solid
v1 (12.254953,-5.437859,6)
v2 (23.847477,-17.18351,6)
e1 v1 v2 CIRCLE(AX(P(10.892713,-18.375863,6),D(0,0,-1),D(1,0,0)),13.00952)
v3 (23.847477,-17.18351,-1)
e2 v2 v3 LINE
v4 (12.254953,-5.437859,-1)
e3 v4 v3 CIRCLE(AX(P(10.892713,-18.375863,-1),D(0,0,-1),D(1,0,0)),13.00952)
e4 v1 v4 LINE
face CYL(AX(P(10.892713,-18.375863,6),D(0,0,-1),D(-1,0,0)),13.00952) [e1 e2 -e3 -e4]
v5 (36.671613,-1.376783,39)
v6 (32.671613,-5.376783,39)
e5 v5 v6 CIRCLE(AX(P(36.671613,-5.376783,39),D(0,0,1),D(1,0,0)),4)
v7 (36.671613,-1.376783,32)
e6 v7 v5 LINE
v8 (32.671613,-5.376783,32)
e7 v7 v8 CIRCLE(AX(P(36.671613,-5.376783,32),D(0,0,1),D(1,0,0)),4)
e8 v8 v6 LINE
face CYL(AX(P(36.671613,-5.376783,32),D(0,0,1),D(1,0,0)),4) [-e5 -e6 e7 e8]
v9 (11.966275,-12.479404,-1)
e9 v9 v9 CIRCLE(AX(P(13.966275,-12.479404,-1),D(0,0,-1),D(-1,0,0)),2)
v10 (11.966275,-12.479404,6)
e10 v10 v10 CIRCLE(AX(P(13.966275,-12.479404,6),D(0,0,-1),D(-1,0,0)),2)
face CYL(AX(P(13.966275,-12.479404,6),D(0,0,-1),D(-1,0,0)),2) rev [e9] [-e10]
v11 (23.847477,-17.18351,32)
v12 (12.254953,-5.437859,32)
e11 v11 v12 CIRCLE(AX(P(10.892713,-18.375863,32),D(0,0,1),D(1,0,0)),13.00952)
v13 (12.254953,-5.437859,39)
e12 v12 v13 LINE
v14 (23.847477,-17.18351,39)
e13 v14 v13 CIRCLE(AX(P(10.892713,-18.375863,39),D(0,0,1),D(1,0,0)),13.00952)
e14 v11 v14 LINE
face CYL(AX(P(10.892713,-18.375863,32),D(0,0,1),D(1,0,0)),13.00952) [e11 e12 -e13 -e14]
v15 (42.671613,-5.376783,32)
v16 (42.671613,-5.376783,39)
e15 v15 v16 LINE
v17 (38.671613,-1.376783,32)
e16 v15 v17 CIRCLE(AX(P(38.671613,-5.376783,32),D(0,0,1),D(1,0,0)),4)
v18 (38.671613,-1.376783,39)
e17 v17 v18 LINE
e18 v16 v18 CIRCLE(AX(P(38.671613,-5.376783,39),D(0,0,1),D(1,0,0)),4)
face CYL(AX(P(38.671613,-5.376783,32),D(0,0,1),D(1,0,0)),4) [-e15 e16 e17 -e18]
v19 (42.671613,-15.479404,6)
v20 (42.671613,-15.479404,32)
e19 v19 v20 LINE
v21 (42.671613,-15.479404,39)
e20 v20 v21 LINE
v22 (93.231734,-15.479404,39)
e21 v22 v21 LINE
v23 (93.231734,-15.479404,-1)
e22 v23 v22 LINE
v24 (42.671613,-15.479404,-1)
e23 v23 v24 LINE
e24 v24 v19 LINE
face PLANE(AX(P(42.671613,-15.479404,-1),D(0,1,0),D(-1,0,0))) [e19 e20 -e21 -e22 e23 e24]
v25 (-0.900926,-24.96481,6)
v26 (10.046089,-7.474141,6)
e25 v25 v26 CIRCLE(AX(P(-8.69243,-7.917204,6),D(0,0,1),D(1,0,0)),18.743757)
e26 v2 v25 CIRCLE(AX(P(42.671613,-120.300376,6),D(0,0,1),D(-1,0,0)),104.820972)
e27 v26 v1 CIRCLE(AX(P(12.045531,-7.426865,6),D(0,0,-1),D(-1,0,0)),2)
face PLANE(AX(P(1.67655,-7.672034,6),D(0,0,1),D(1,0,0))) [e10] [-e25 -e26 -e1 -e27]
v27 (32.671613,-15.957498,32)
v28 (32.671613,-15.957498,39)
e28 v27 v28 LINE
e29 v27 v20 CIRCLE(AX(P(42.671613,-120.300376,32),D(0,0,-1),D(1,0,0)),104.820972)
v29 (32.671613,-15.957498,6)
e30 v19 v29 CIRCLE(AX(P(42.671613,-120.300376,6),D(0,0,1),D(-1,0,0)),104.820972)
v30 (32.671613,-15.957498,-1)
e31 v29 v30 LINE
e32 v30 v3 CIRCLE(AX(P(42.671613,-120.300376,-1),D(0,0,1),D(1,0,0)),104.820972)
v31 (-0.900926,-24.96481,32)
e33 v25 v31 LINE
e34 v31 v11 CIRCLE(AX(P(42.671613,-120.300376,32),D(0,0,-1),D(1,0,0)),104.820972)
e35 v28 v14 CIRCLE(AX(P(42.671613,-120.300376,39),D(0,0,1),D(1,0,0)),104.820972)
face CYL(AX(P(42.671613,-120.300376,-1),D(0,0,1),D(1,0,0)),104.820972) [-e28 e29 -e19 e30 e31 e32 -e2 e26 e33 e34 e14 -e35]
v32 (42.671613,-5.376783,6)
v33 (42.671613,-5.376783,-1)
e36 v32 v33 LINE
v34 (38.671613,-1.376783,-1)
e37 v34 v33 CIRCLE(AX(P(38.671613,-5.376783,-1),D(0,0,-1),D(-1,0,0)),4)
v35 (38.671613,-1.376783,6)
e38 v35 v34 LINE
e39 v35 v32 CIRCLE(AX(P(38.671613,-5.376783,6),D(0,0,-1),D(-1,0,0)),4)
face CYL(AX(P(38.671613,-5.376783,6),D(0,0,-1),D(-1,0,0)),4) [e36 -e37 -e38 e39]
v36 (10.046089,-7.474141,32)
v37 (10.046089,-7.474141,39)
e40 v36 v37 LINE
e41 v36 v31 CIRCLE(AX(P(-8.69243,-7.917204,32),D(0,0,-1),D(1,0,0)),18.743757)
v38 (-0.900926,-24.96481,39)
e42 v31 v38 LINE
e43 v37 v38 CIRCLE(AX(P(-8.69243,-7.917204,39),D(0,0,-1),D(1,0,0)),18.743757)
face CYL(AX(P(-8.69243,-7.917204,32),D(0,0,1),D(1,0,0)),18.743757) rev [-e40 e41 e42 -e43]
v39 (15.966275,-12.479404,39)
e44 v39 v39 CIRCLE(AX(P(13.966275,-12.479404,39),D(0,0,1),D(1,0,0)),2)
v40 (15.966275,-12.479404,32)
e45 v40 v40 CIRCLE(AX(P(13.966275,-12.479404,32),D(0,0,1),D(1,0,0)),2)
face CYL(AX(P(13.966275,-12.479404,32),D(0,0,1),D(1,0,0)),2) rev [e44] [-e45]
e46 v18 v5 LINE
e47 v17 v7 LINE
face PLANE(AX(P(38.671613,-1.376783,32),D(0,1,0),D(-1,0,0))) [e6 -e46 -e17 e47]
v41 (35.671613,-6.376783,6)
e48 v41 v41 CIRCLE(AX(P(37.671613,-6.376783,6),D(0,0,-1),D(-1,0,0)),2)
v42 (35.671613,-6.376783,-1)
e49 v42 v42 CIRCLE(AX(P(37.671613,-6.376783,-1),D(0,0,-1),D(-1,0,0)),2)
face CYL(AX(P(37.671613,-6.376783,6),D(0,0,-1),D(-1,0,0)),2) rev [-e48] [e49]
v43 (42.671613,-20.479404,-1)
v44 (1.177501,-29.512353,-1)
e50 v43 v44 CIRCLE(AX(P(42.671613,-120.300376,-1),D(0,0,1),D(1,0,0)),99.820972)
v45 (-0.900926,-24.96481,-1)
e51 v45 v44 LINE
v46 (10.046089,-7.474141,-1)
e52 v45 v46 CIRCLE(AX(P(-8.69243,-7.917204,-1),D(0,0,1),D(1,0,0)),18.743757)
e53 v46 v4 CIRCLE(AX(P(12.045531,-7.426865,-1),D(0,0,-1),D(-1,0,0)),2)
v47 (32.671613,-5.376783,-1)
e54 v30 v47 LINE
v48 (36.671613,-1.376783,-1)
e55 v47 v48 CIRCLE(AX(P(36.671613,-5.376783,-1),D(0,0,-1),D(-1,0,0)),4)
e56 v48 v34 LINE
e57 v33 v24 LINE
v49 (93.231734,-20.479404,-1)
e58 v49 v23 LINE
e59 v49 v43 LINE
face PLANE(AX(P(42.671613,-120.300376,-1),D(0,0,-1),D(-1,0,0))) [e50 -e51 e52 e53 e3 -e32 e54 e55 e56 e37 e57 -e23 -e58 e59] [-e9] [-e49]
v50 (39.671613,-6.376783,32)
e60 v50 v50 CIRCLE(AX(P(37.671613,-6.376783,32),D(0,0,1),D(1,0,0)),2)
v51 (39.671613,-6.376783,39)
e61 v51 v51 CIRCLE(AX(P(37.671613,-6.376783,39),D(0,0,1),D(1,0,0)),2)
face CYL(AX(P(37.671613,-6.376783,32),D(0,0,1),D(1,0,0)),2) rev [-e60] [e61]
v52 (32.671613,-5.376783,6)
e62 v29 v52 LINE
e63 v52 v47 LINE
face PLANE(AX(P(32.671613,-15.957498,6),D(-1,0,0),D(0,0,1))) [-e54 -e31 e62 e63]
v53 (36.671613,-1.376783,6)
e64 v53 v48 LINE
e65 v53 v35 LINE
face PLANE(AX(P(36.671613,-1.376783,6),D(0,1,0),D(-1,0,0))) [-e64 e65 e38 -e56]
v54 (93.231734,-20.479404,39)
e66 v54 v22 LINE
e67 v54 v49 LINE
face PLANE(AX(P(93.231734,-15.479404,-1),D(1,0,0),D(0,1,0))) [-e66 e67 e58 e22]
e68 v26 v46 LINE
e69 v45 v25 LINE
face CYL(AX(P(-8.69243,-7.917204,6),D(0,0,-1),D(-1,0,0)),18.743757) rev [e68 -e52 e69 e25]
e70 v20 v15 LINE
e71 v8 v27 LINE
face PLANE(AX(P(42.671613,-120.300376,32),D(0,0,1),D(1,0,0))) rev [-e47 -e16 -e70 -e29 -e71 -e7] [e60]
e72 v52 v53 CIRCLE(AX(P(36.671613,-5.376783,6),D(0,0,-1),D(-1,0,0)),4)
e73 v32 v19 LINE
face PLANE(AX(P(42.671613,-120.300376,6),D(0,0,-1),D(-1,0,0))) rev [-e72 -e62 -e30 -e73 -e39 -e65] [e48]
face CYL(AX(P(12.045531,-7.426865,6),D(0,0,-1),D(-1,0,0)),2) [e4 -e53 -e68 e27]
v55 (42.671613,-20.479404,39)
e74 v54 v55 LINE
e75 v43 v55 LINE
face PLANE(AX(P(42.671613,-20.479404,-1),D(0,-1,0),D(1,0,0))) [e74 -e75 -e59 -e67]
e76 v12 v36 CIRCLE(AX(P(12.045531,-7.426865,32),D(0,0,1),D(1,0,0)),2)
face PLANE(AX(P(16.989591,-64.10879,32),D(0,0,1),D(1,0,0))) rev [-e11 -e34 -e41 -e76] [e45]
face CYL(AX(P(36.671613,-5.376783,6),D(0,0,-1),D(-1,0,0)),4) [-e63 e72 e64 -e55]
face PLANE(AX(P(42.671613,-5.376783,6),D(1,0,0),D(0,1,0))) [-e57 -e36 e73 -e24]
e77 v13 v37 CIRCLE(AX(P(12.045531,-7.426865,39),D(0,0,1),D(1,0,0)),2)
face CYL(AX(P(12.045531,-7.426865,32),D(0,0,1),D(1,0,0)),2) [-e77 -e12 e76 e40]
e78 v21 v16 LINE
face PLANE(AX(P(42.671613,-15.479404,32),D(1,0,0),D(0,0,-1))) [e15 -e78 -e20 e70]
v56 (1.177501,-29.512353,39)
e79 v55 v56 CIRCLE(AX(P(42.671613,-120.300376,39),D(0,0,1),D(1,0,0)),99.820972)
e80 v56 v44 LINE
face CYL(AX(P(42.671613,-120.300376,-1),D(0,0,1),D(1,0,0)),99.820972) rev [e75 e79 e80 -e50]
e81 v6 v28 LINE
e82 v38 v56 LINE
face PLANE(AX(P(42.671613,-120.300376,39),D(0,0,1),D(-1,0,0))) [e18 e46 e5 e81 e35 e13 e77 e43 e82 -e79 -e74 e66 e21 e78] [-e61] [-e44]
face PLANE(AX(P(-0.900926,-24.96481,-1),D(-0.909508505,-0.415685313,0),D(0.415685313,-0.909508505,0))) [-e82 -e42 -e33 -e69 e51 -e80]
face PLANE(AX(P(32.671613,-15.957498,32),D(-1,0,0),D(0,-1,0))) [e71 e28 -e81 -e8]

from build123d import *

# Parameters (mm, degrees)
BOSS_EXTRUDE1_DEPTH     = 38
BOSS_EXTRUDE2_START     = 1
BOSS_EXTRUDE2_DEPTH     = 1
SKETCH5_R               = 1.5
BOSS_EXTRUDE4_DEPTH     = 2
CUT_EXTRUDE1_REACH      = 109.923
CUT_EXTRUDE1_END_RADIUS = 5
SKETCH6_W               = 4
SKETCH6_H               = 25
SKETCH7_W               = 12
SKETCH7_H               = 7
CUT_EXTRUDE2_DEPTH      = 4.870537
SKETCH8_W               = 14
SKETCH8_H               = 8
SKETCH8_W_2             = 7
SKETCH8_H_2             = 2
BOSS_EXTRUDE5_DEPTH     = 1
CUT_EXTRUDE3_REACH      = 112.064
BOSS_EXTRUDE6_REACH     = 114.27
FILLET1_R               = 2
FILLET2_R               = 1.5
CUT_EXTRUDE4_START      = -1
CUT_EXTRUDE4_DEPTH      = 1
CUT_EXTRUDE5_DEPTH      = 114.605044241
CUT_EXTRUDE5_DEPTH_BACK = 114.605044241
CUT_EXTRUDE6_DEPTH      = 1
BOSS_EXTRUDE7_DEPTH     = 40
CUT_EXTRUDE7_DEPTH      = 114.952209619
BOSS_EXTRUDE8_START     = -7
SKETCH16_R              = 2
BOSS_EXTRUDE8_DEPTH     = 7
SKETCH17_R              = 2
BOSS_EXTRUDE9_DEPTH     = 7
SKETCH18_R              = 2
BOSS_EXTRUDE10_DEPTH    = 7
BOSS_EXTRUDE11_START    = -7
SKETCH19_R              = 2
BOSS_EXTRUDE11_DEPTH    = 7


with BuildPart() as part:
    # Sketch1 → Boss-Extrude1 (new body)
    with BuildSketch(Plane.XY):
        with BuildLine():
            ThreePointArc((94.07424068, -40.969403892), (98.52214239, -30.71978446), (94.053011164, -20.479403892))
            Line((94.053011164, -20.479403892), (42.671612541, -20.479403892))
            ThreePointArc((42.671612541, -20.479403892), (21.438645912, -22.763779795), (1.177500664, -29.512352859))
            ThreePointArc((1.177500664, -29.512352859), (-2.191079084, -36.245666757), (3.671612541, -40.969403889))
            Line((3.671612541, -40.969403889), (3.671612541, -39.969403889))
            ThreePointArc((3.671612541, -39.969403889), (-1.213963813, -36.032956279), (1.593185977, -30.421861364))
            ThreePointArc((1.593185977, -30.421861364), (21.65135639, -23.740895066), (42.671612541, -21.479403892))
            Line((42.671612541, -21.479403892), (93.651612541, -21.479403892))
            ThreePointArc((93.651612541, -21.479403892), (97.522142299, -30.720228087), (93.671612541, -39.969403889))
            Line((93.671612541, -39.969403889), (93.671612541, -40.969403892))
            Line((93.671612541, -40.969403892), (94.07424068, -40.969403892))
        make_face()
    extrude(amount=BOSS_EXTRUDE1_DEPTH)

    # Sketch2 → Boss-Extrude2 (add)
    with BuildSketch(Plane(origin=(0, 0, 0), x_dir=(-1, 0, 0), z_dir=(0, 0, -1)).offset(BOSS_EXTRUDE2_START)):
        with BuildLine():
            Line((-93.671612541, -40.969403892), (-3.671612541, -40.969403889))
            ThreePointArc((-3.671612541, -40.969403889), (2.191079084, -36.245666757), (-1.177500664, -29.512352859))
            ThreePointArc((-1.177500664, -29.512352859), (-21.438645912, -22.763779795), (-42.671612541, -20.479403892))
            Line((-42.671612541, -20.479403892), (-94.053011164, -20.479403892))
            ThreePointArc((-94.053011164, -20.479403892), (-98.52214239, -30.71978446), (-94.07424068, -40.969403892))
            Line((-94.07424068, -40.969403892), (-93.671612541, -40.969403892))
        make_face()
    boss_extrude2 = extrude(amount=-BOSS_EXTRUDE2_DEPTH)

    # Mirror1: Boss-Extrude2 across plane
    add(boss_extrude2.mirror(Plane.XY.offset(19)))

    # Sketch5 → Boss-Extrude4 (add)
    with BuildSketch(Plane.XZ.offset(21.479403892)):
        with Locations(Location((45.301612541, 27.89, 0), (0, 0, 270))):
            Circle(SKETCH5_R)
        with Locations(Location((45.301612541, 10.11, 0), (0, 0, 270))):
            Circle(SKETCH5_R)
        with Locations(Location((91.021612541, 27.89, 0), (0, 0, 270))):
            Circle(SKETCH5_R)
        with Locations(Location((91.021612541, 10.11, 0), (0, 0, 270))):
            Circle(SKETCH5_R)
    extrude(amount=BOSS_EXTRUDE4_DEPTH)

    # Cut-Extrude1: up to this cylinder (the profile starts outside it)
    cut_extrude1_end = Plane(origin=(3.671612541, -34.969403889, 19), z_dir=(0, 0, -1)) * Cylinder(CUT_EXTRUDE1_END_RADIUS, 230.846, mode=Mode.PRIVATE)
    # Sketch6 → Cut-Extrude1 (cut, up to the surface)
    with BuildSketch(Plane(origin=(0.000112733, -40.969403891, 0), x_dir=(1, 0, 0), z_dir=(0, -1, 0)), mode=Mode.PRIVATE) as cut_extrude1_sk1:
        with Locations((1.671499809, 19)):
            Rectangle(SKETCH6_W, SKETCH6_H)
    cut_extrude1_tool1 = extrude(cut_extrude1_sk1.sketch, amount=-CUT_EXTRUDE1_REACH, mode=Mode.PRIVATE) - cut_extrude1_end
    add(cut_extrude1_tool1.solids().sort_by_distance((1.671613, -40.969404, 19))[0], mode=Mode.SUBTRACT)

    # Sketch7 → Cut-Extrude2 (cut)
    with BuildSketch(Plane(origin=(98.522149904, 0, 0), x_dir=(0, 0, -1), z_dir=(1, 0, 0))):
        with Locations((-19, -23.979403892)):
            Rectangle(SKETCH7_W, SKETCH7_H)
    extrude(amount=-CUT_EXTRUDE2_DEPTH, mode=Mode.SUBTRACT)

    # Sketch8 → Boss-Extrude5 (add)
    with BuildSketch(Plane(origin=(93.651612541, 0, 0), x_dir=(0, 0, -1), z_dir=(1, 0, 0))):
        with Locations((-19, -24.479403892)):
            Rectangle(SKETCH8_W, SKETCH8_H)
        with Locations((-19, -24.179403892)):
            Rectangle(SKETCH8_W_2, SKETCH8_H_2, mode=Mode.SUBTRACT)
    extrude(amount=BOSS_EXTRUDE5_DEPTH)

    # Sketch9 → Cut-Extrude3 (cut, up to next)
    with BuildSketch(Plane.XY.offset(26), mode=Mode.PRIVATE) as cut_extrude3_sk1:
        with BuildLine():
            Line((94.651612541, -21.070233304), (94.651612541, -20.479403892))
            Line((94.651612541, -20.479403892), (94.053011164, -20.479403892))
            ThreePointArc((94.053011164, -20.479403892), (94.356749733, -20.770322341), (94.651612541, -21.070233304))
        make_face()
    cut_extrude3_tool1 = extrude(cut_extrude3_sk1.sketch, amount=-CUT_EXTRUDE3_REACH, mode=Mode.PRIVATE) & part.part
    add(cut_extrude3_tool1.solids().sort_by_distance((94.454082, -20.674371, 26))[0], mode=Mode.SUBTRACT)

    # Sketch10 → Boss-Extrude6 (add, up to next)
    with BuildSketch(Plane(origin=(94.651612541, 0, 0), x_dir=(0, 0, -1), z_dir=(1, 0, 0)), mode=Mode.PRIVATE) as boss_extrude6_sk1:
        Polygon((-26, -22.586039205), (-26, -28.479403892), (-12, -28.479403892), (-12, -22.586039205), (-13, -22.586039205), (-13, -27.479403892), (-25, -27.479403892), (-25, -22.586039205), align=None)
    boss_extrude6_tool1 = extrude(boss_extrude6_sk1.sketch, amount=BOSS_EXTRUDE6_REACH, mode=Mode.PRIVATE) - part.part
    add(boss_extrude6_tool1.solids().sort_by_distance((94.651613, -25.532722, 25.848101))[0])

    # Fillet1
    # the kernel refuses this fillet: 2 mm, written as the material it takes off along each edge
    with BuildSketch(Plane(origin=(94.053011164, -20.479403892, -3.217701096), x_dir=(-1, 0, 0), z_dir=(0, 0, 1))) as fillet1_piece_1:
        with BuildLine():
            CenterArc((0.8212769, 2), FILLET1_R, 223.46466941, 46.53533059)
            ThreePointArc((-0.630320494, 0.624185693), (-0.320105264, 0.307099227), (0, 0))
            Line((0, 0), (0.8212769, 0))
        make_face()
    extrude(amount=44.435402191, mode=Mode.SUBTRACT)

    # Fillet2
    # the kernel refuses this fillet: 1.5 mm, written as the material it takes off along each edge
    with BuildSketch(Plane(origin=(93.651612541, -28.479403892, 8.25), x_dir=(1, 0, 0), z_dir=(0, 0, 1))) as fillet2_piece_1:
        with BuildLine():
            CenterArc((FILLET2_R, FILLET2_R), FILLET2_R, 180, 90)
            Line((0, FILLET2_R), (0, 0))
            Line((0, 0), (FILLET2_R, 0))
        make_face()
    extrude(amount=21.5, mode=Mode.SUBTRACT)
    with BuildSketch(Plane(origin=(94.651612541, -21.070877825, 25), x_dir=(-0.9302888810599873, 0.3668277494630918, 0), z_dir=(0, 0, -1))) as fillet2_piece_2:
        with BuildLine():
            CenterArc((1.062160749, -1.395433322), FILLET2_R, 68.479891106, 90)
            Line((-0.333272572, -0.845191697), (-0.472815904, -0.790167535))
            Line((-0.472815904, -0.790167535), (-0.139543332, 0.055024162))
            Line((-0.139543332, 0.055024162), (-0.060315789, 0.137339017))
            ThreePointArc((-0.060315789, 0.137339017), (1.592890188, 0.168934204), (1.667426536, 0.139543332))
            Line((1.667426536, 0.139543332), (1.612402374, 0))
        make_face()
    extrude(amount=12, mode=Mode.SUBTRACT)

    # Sketch11 → Cut-Extrude4 (cut)
    with BuildSketch(Plane.XY.offset(39).offset(CUT_EXTRUDE4_START)):
        with BuildLine():
            Line((94.07424068, -40.969403892), (94.07424068, -27.479403892))
            Line((94.07424068, -27.479403892), (42.671612541, -27.479403892))
            ThreePointArc((42.671612541, -27.479403892), (20.062639565, -30.27500623), (-1.184449421, -38.493416121))
            ThreePointArc((-1.184449421, -38.493416121), (0.946183529, -40.314685612), (3.671612541, -40.969403889))
            Line((3.671612541, -40.969403889), (94.07424068, -40.969403892))
        make_face()
    extrude(amount=CUT_EXTRUDE4_DEPTH, mode=Mode.SUBTRACT)

    # Sketch12 → Cut-Extrude5 (cut, two sides: drawn at the far end of the back side and taken through both)
    with BuildSketch(Plane.XY.offset(38).offset(-CUT_EXTRUDE5_DEPTH_BACK)):
        with BuildLine():
            Line((0.671612541, -40.165556311), (0.671612541, -38.969403889))
            ThreePointArc((0.671612541, -38.969403889), (2.090473711, -39.712820379), (3.671612541, -39.969403889))
            Line((3.671612541, -39.969403889), (3.671612541, -40.969403889))
            ThreePointArc((3.671612541, -40.969403889), (2.118698271, -40.764958846), (0.671612541, -40.165556311))
        make_face()
    extrude(amount=CUT_EXTRUDE5_DEPTH + CUT_EXTRUDE5_DEPTH_BACK, mode=Mode.SUBTRACT)

    # Sketch13 → Cut-Extrude6 (cut)
    with BuildSketch(Plane(origin=(0, 0, -1), x_dir=(-1, 0, 0), z_dir=(0, 0, -1))):
        with BuildLine():
            Line((-94.07424068, -27.479403892), (-94.07424068, -40.969403892))
            Line((-94.07424068, -40.969403892), (-3.671612541, -40.969403889))
            Line((-3.671612541, -40.969403889), (-3.671612541, -39.969403889))
            ThreePointArc((-3.671612541, -39.969403889), (-2.090473711, -39.712820379), (-0.671612541, -38.969403889))
            Line((-0.671612541, -38.969403889), (-0.671612541, -40.165556311))
            ThreePointArc((-0.671612541, -40.165556311), (0.344410441, -39.427156619), (1.184449421, -38.493416121))
            ThreePointArc((1.184449421, -38.493416121), (-20.062639565, -30.27500623), (-42.671612541, -27.479403892))
            Line((-42.671612541, -27.479403892), (-94.07424068, -27.479403892))
        make_face()
    extrude(amount=-CUT_EXTRUDE6_DEPTH, mode=Mode.SUBTRACT)

    # Sketch14 → Boss-Extrude7 (add, through all)
    with BuildSketch(Plane.XY.offset(39)):
        with BuildLine():
            Line((42.671612541, -20.479403892), (93.231734264, -20.479403892))
            Line((93.231734264, -20.479403892), (93.231734264, -15.479403892))
            Line((93.231734264, -15.479403892), (42.671612541, -15.479403892))
            ThreePointArc((42.671612541, -15.479403892), (20.375093521, -17.878203441), (-0.9009259, -24.964810334))
            Line((-0.9009259, -24.964810334), (1.177500664, -29.512352859))
            ThreePointArc((1.177500664, -29.512352859), (21.438645912, -22.763779795), (42.671612541, -20.479403892))
        make_face()
    extrude(amount=-BOSS_EXTRUDE7_DEPTH)

    # Sketch15 → Cut-Extrude7 (cut, through all)
    with BuildSketch(Plane.XY.offset(39)):
        with BuildLine():
            Line((93.231734264, -20.479403892), (113.754694227, -15.939324801))
            Line((113.754694227, -15.939324801), (103.493214246, -63.655688178))
            Line((103.493214246, -63.655688178), (-19.85580102, -63.655688178))
            Line((-19.85580102, -63.655688178), (-16.285239541, -25.988091954))
            Line((-16.285239541, -25.988091954), (1.177500664, -29.512352859))
            ThreePointArc((1.177500664, -29.512352859), (21.438645912, -22.763779795), (42.671612541, -20.479403892))
            Line((42.671612541, -20.479403892), (93.231734264, -20.479403892))
        make_face()
    extrude(amount=-CUT_EXTRUDE7_DEPTH, mode=Mode.SUBTRACT)

    # Sketch16 → Boss-Extrude8 (add)
    with BuildSketch(Plane(origin=(0, 0, -1), x_dir=(-1, 0, 0), z_dir=(0, 0, -1)).offset(BOSS_EXTRUDE8_START)):
        with BuildLine():
            ThreePointArc((0.9009259, -24.964810334), (-11.231615785, -20.305562163), (-23.847476831, -17.18350974))
            ThreePointArc((-23.847476831, -17.18350974), (-20.15199056, -9.237296242), (-12.254952675, -5.437859392))
            ThreePointArc((-12.254952675, -5.437859392), (-10.689930256, -5.956372475), (-10.046089467, -7.474140583))
            ThreePointArc((-10.046089467, -7.474140583), (-7.195975116, -17.861398125), (0.9009259, -24.964810334))
        make_face()
        with Locations((-13.96627469, -12.479403892)):
            Circle(SKETCH16_R, mode=Mode.SUBTRACT)
    extrude(amount=BOSS_EXTRUDE8_DEPTH)

    # Sketch17 → Boss-Extrude9 (add)
    with BuildSketch(Plane.XY.offset(39)):
        with BuildLine():
            ThreePointArc((-0.9009259, -24.964810334), (7.195975116, -17.861398125), (10.046089467, -7.474140583))
            ThreePointArc((10.046089467, -7.474140583), (10.689930256, -5.956372475), (12.254952675, -5.437859392))
            ThreePointArc((12.254952675, -5.437859392), (20.15199056, -9.237296242), (23.847476831, -17.18350974))
            ThreePointArc((23.847476831, -17.18350974), (11.231615785, -20.305562163), (-0.9009259, -24.964810334))
        make_face()
        with Locations(Location((13.96627469, -12.479403892, 0), (0, 0, 180))):
            Circle(SKETCH17_R, mode=Mode.SUBTRACT)
    extrude(amount=-BOSS_EXTRUDE9_DEPTH)

    # Sketch18 → Boss-Extrude10 (add)
    with BuildSketch(Plane.XY.offset(39)):
        with BuildLine():
            Line((42.671612541, -15.479403892), (42.671612541, -5.376783048))
            ThreePointArc((42.671612541, -5.376783048), (41.500039666, -2.548355923), (38.671612541, -1.376783048))
            Line((38.671612541, -1.376783048), (36.671612541, -1.376783048))
            ThreePointArc((36.671612541, -1.376783048), (33.843185417, -2.548355923), (32.671612541, -5.376783048))
            Line((32.671612541, -5.376783048), (32.671612541, -15.95749798))
            ThreePointArc((32.671612541, -15.95749798), (37.665901454, -15.598995636), (42.671612541, -15.479403892))
        make_face()
        with Locations((37.671612541, -6.376783048)):
            Circle(SKETCH18_R, mode=Mode.SUBTRACT)
    extrude(amount=-BOSS_EXTRUDE10_DEPTH)

    # Sketch19 → Boss-Extrude11 (add)
    with BuildSketch(Plane(origin=(0, 0, -1), x_dir=(-1, 0, 0), z_dir=(0, 0, -1)).offset(BOSS_EXTRUDE11_START)):
        with BuildLine():
            Line((-32.671612541, -15.95749798), (-32.671612541, -5.376783048))
            ThreePointArc((-32.671612541, -5.376783048), (-33.843185417, -2.548355923), (-36.671612541, -1.376783048))
            Line((-36.671612541, -1.376783048), (-38.671612541, -1.376783048))
            ThreePointArc((-38.671612541, -1.376783048), (-41.500039666, -2.548355923), (-42.671612541, -5.376783048))
            Line((-42.671612541, -5.376783048), (-42.671612541, -15.479403892))
            ThreePointArc((-42.671612541, -15.479403892), (-37.665901454, -15.598995636), (-32.671612541, -15.95749798))
        make_face()
        with Locations(Location((-37.671612541, -6.376783048, 0), (0, 0, 180))):
            Circle(SKETCH19_R, mode=Mode.SUBTRACT)
    extrude(amount=BOSS_EXTRUDE11_DEPTH)


solid = part.part
